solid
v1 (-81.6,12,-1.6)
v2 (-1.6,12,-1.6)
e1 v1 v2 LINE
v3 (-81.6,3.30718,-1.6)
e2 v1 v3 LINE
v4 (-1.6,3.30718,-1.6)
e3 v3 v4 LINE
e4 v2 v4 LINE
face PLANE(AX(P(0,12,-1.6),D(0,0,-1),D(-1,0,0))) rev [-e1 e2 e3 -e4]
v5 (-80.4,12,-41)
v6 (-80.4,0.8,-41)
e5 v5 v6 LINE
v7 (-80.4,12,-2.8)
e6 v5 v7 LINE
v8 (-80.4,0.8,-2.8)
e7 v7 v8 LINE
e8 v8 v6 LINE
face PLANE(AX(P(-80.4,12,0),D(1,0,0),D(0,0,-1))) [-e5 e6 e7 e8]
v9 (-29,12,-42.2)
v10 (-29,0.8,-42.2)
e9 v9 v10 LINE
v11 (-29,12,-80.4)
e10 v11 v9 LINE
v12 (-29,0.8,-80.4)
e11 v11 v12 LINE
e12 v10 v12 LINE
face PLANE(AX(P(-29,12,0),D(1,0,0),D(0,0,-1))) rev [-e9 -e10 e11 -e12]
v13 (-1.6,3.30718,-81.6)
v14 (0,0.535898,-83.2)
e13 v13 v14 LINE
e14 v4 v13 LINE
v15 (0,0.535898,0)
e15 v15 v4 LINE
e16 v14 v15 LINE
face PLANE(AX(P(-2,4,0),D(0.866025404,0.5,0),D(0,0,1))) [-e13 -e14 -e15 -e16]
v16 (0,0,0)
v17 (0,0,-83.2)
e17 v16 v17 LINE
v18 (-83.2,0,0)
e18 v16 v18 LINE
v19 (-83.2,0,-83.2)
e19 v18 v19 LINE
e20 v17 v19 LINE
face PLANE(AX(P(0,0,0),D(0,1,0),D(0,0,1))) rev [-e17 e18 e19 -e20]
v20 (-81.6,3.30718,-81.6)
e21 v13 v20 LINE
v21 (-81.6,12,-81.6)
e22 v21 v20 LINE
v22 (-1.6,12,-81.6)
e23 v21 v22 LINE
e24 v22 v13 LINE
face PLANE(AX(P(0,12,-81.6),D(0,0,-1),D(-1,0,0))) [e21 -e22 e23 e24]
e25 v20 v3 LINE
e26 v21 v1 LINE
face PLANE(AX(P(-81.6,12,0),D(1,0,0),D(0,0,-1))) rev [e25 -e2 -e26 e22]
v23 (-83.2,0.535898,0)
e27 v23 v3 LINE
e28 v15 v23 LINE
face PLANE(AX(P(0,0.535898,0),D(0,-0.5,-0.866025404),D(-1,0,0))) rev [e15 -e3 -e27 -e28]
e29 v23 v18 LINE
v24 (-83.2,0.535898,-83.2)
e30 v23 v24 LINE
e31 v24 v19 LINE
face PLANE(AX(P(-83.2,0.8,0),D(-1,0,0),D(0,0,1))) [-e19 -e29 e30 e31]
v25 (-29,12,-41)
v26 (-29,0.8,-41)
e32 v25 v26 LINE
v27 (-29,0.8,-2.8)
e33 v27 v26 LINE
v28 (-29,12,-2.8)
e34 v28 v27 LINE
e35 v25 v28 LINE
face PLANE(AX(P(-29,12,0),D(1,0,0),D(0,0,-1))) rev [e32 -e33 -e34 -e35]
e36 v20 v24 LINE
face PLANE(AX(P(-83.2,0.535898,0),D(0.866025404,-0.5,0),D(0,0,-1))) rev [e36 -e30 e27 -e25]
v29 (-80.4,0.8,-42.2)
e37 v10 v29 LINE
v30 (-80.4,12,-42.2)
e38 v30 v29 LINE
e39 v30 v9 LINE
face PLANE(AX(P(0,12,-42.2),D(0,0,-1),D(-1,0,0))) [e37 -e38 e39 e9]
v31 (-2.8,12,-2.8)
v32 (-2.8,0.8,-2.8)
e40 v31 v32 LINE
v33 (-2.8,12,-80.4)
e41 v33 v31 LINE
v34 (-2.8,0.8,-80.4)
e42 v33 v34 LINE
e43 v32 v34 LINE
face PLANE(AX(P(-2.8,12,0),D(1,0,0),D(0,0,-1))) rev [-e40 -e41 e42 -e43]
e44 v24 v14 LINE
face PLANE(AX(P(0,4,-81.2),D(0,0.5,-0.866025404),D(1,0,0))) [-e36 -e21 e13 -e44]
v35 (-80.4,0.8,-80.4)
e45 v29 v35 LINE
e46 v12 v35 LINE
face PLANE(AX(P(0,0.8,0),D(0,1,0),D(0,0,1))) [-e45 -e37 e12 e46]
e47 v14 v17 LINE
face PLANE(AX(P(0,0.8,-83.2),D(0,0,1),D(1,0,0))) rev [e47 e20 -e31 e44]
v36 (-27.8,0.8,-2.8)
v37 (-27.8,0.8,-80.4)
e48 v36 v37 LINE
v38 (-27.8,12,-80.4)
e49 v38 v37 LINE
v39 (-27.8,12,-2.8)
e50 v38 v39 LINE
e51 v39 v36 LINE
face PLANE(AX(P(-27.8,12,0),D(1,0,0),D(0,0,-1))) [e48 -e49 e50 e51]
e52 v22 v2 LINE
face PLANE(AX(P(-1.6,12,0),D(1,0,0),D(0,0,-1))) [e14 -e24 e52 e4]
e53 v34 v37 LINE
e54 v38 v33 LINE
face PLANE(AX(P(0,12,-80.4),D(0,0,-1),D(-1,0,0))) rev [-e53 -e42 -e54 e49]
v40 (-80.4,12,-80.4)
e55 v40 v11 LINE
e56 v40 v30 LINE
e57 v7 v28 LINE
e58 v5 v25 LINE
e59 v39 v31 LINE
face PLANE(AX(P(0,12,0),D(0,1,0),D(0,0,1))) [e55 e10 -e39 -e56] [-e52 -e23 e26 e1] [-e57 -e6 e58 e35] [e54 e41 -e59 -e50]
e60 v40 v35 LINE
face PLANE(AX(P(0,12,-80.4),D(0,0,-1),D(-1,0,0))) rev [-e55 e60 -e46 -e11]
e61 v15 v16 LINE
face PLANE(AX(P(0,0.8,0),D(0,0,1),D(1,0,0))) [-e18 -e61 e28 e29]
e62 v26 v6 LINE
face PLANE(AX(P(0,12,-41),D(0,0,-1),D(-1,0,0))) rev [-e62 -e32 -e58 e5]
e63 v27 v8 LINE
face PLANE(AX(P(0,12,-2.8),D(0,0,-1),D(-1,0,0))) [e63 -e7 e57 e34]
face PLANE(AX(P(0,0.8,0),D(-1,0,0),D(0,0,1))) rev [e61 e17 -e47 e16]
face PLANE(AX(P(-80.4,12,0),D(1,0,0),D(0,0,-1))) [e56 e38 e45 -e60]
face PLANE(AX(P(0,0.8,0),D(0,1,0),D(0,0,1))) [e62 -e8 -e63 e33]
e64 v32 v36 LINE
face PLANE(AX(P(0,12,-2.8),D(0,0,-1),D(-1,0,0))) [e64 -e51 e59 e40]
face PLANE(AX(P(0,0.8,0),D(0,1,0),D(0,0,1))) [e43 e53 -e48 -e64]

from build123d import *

# Parameters (mm, degrees)
SKICA1_W                = 83.2
SKICA1_H                = 83.2
P_IDAT_VYSUNUT_M1_DEPTH = 0.8
SKICA1_3_W              = 80
SKICA1_3_H              = 80
SKICA1_3_W_2            = 25
SKICA1_3_H_2            = 77.6
SKICA1_3_W_3            = 51.4
SKICA1_3_H_3            = 38.2
P_IDAT_VYSUNUT_M2_DEPTH = 12
SKICA1_4_W              = 83.2
SKICA1_4_H              = 83.2
SKICA1_4_W_2            = 80
SKICA1_4_H_2            = 80
P_IDAT_VYSUNUT_M3_DEPTH = 4
ZKOSEN_2_SIZE           = 3.464101615
ZKOSEN_2_SIZE_2         = 2


with BuildPart() as part:
    # Skica1 → Přidat vysunutím1 (new body)
    with BuildSketch(Plane(origin=(0, 0, 0), x_dir=(1, 0, 0), z_dir=(0, 1, 0))):
        with Locations((-41.6, 41.6)):
            Rectangle(SKICA1_W, SKICA1_H)
    extrude(amount=P_IDAT_VYSUNUT_M1_DEPTH)

    # Skica1<3> → Přidat vysunutím2 (add)
    with BuildSketch(Plane(origin=(0, 0, 0), x_dir=(1, 0, 0), z_dir=(0, 1, 0))):
        with Locations((-41.6, 41.6)):
            Rectangle(SKICA1_3_W, SKICA1_3_H)
        with Locations((-15.3, 41.6)):
            Rectangle(SKICA1_3_W_2, SKICA1_3_H_2, mode=Mode.SUBTRACT)
        with Locations((-54.7, 61.3)):
            Rectangle(SKICA1_3_W_3, SKICA1_3_H_3, mode=Mode.SUBTRACT)
        with Locations((-54.7, 21.9)):
            Rectangle(SKICA1_3_W_3, SKICA1_3_H_3, mode=Mode.SUBTRACT)
    extrude(amount=P_IDAT_VYSUNUT_M2_DEPTH)

    # Skica1<4> → Přidat vysunutím3 (add)
    with BuildSketch(Plane(origin=(0, 0, 0), x_dir=(1, 0, 0), z_dir=(0, 1, 0))):
        with Locations((-41.6, 41.6)):
            Rectangle(SKICA1_4_W, SKICA1_4_H)
        with Locations((-41.6, 41.6)):
            Rectangle(SKICA1_4_W_2, SKICA1_4_H_2, mode=Mode.SUBTRACT)
    extrude(amount=P_IDAT_VYSUNUT_M3_DEPTH)

    # Zkosení2
    # the kernel refuses this chamfer: 3.464101615, 2 mm, written as the material it takes off along each edge
    with BuildSketch(Plane(origin=(-83.2, 4, 8.961927941), x_dir=(-0.0193267656126997, -0.9998132206222079, 0), z_dir=(0, 0, -1))) as zkosen_2_piece_1_section:
        Polygon((ZKOSEN_2_SIZE * 0.999813220662, -ZKOSEN_2_SIZE * 0.0193267656135), (-ZKOSEN_2_SIZE_2 * 0.0193267656127, -ZKOSEN_2_SIZE_2 * 0.999813220622), (0, 0), align=None)
    zkosen_2_piece_1 = extrude(amount=101.123855882, mode=Mode.PRIVATE)
    zkosen_2_piece_1 = split(zkosen_2_piece_1, bisect_by=Plane(origin=(-81.6, 2.781142692, 3.680963971), z_dir=(-1, 0, 0)), keep=Keep.TOP, mode=Mode.PRIVATE)
    zkosen_2_piece_1 = split(zkosen_2_piece_1, bisect_by=Plane(origin=(-82.620942714, 2.781142692, -1.6), z_dir=(0, 0, 1)), keep=Keep.TOP, mode=Mode.PRIVATE)
    add(zkosen_2_piece_1, mode=Mode.SUBTRACT)
    with BuildSketch(Plane(origin=(-83.2, 4, 8.961927941), x_dir=(-0.0193267656126997, -0.9998132206222079, 0), z_dir=(0, 0, -1))) as zkosen_2_piece_2_section:
        Polygon((ZKOSEN_2_SIZE * 0.999813220662, -ZKOSEN_2_SIZE * 0.0193267656135), (-ZKOSEN_2_SIZE_2 * 0.0193267656127, -ZKOSEN_2_SIZE_2 * 0.999813220622), (0, 0), align=None)
    zkosen_2_piece_2 = extrude(amount=101.123855882, mode=Mode.PRIVATE)
    zkosen_2_piece_2 = split(zkosen_2_piece_2, bisect_by=Plane(origin=(-81.6, 3.870737408, 3.680963971), z_dir=(1, 0, 0)), keep=Keep.TOP, mode=Mode.PRIVATE)
    zkosen_2_piece_2 = split(zkosen_2_piece_2, bisect_by=Plane(origin=(-81.431601135, 3.870737408, -1.6), z_dir=(0, 0, 1)), keep=Keep.TOP, mode=Mode.PRIVATE)
    add(zkosen_2_piece_2, mode=Mode.SUBTRACT)
    with BuildSketch(Plane(origin=(-83.2, 4, 8.961927941), x_dir=(-0.0193267656126997, -0.9998132206222079, 0), z_dir=(0, 0, -1))) as zkosen_2_piece_3_section:
        Polygon((ZKOSEN_2_SIZE * 0.999813220662, -ZKOSEN_2_SIZE * 0.0193267656135), (-ZKOSEN_2_SIZE_2 * 0.0193267656127, -ZKOSEN_2_SIZE_2 * 0.999813220622), (0, 0), align=None)
    zkosen_2_piece_3 = extrude(amount=101.123855882, mode=Mode.PRIVATE)
    zkosen_2_piece_3 = split(zkosen_2_piece_3, bisect_by=Plane(origin=(-81.6, 2.781142692, -41.6), z_dir=(-1, 0, 0)), keep=Keep.TOP, mode=Mode.PRIVATE)
    zkosen_2_piece_3 = split(zkosen_2_piece_3, bisect_by=Plane(origin=(-82.620942714, 2.781142692, -1.6), z_dir=(0, 0, -1)), keep=Keep.TOP, mode=Mode.PRIVATE)
    zkosen_2_piece_3 = split(zkosen_2_piece_3, bisect_by=Plane(origin=(-82.620942714, 2.781142692, -81.6), z_dir=(0, 0, 1)), keep=Keep.TOP, mode=Mode.PRIVATE)
    add(zkosen_2_piece_3, mode=Mode.SUBTRACT)
    with BuildSketch(Plane(origin=(-83.2, 4, 8.961927941), x_dir=(-0.0193267656126997, -0.9998132206222079, 0), z_dir=(0, 0, -1))) as zkosen_2_piece_4_section:
        Polygon((ZKOSEN_2_SIZE * 0.999813220662, -ZKOSEN_2_SIZE * 0.0193267656135), (-ZKOSEN_2_SIZE_2 * 0.0193267656127, -ZKOSEN_2_SIZE_2 * 0.999813220622), (0, 0), align=None)
    zkosen_2_piece_4 = extrude(amount=101.123855882, mode=Mode.PRIVATE)
    zkosen_2_piece_4 = split(zkosen_2_piece_4, bisect_by=Plane(origin=(-81.6, 2.781142692, -86.880963971), z_dir=(-1, 0, 0)), keep=Keep.TOP, mode=Mode.PRIVATE)
    zkosen_2_piece_4 = split(zkosen_2_piece_4, bisect_by=Plane(origin=(-82.620942714, 2.781142692, -81.6), z_dir=(0, 0, -1)), keep=Keep.TOP, mode=Mode.PRIVATE)
    add(zkosen_2_piece_4, mode=Mode.SUBTRACT)
    with BuildSketch(Plane(origin=(-83.2, 4, 8.961927941), x_dir=(-0.0193267656126997, -0.9998132206222079, 0), z_dir=(0, 0, -1))) as zkosen_2_piece_5_section:
        Polygon((ZKOSEN_2_SIZE * 0.999813220662, -ZKOSEN_2_SIZE * 0.0193267656135), (-ZKOSEN_2_SIZE_2 * 0.0193267656127, -ZKOSEN_2_SIZE_2 * 0.999813220622), (0, 0), align=None)
    zkosen_2_piece_5 = extrude(amount=101.123855882, mode=Mode.PRIVATE)
    zkosen_2_piece_5 = split(zkosen_2_piece_5, bisect_by=Plane(origin=(-81.6, 3.870737408, -86.880963971), z_dir=(1, 0, 0)), keep=Keep.TOP, mode=Mode.PRIVATE)
    zkosen_2_piece_5 = split(zkosen_2_piece_5, bisect_by=Plane(origin=(-81.431601135, 3.870737408, -81.6), z_dir=(0, 0, -1)), keep=Keep.TOP, mode=Mode.PRIVATE)
    add(zkosen_2_piece_5, mode=Mode.SUBTRACT)
    with BuildSketch(Plane(origin=(-92.161927941, 4, -83.2), x_dir=(0, -0.9998132206222079, -0.0193267656126997), z_dir=(1, 0, 0))) as zkosen_2_piece_6_section:
        Polygon((ZKOSEN_2_SIZE * 0.999813220662, -ZKOSEN_2_SIZE * 0.0193267656135), (-ZKOSEN_2_SIZE_2 * 0.0193267656127, -ZKOSEN_2_SIZE_2 * 0.999813220622), (0, 0), align=None)
    zkosen_2_piece_6 = extrude(amount=101.123855882, mode=Mode.PRIVATE)
    zkosen_2_piece_6 = split(zkosen_2_piece_6, bisect_by=Plane(origin=(-81.6, 2.781142692, -82.620942714), z_dir=(-1, 0, 0)), keep=Keep.TOP, mode=Mode.PRIVATE)
    zkosen_2_piece_6 = split(zkosen_2_piece_6, bisect_by=Plane(origin=(-86.880963971, 2.781142692, -81.6), z_dir=(0, 0, -1)), keep=Keep.TOP, mode=Mode.PRIVATE)
    add(zkosen_2_piece_6, mode=Mode.SUBTRACT)
    with BuildSketch(Plane(origin=(-92.161927941, 4, -83.2), x_dir=(0, -0.9998132206222079, -0.0193267656126997), z_dir=(1, 0, 0))) as zkosen_2_piece_7_section:
        Polygon((ZKOSEN_2_SIZE * 0.999813220662, -ZKOSEN_2_SIZE * 0.0193267656135), (-ZKOSEN_2_SIZE_2 * 0.0193267656127, -ZKOSEN_2_SIZE_2 * 0.999813220622), (0, 0), align=None)
    zkosen_2_piece_7 = extrude(amount=101.123855882, mode=Mode.PRIVATE)
    zkosen_2_piece_7 = split(zkosen_2_piece_7, bisect_by=Plane(origin=(-81.6, 3.870737408, -81.431601135), z_dir=(-1, 0, 0)), keep=Keep.TOP, mode=Mode.PRIVATE)
    zkosen_2_piece_7 = split(zkosen_2_piece_7, bisect_by=Plane(origin=(-86.880963971, 3.870737408, -81.6), z_dir=(0, 0, 1)), keep=Keep.TOP, mode=Mode.PRIVATE)
    add(zkosen_2_piece_7, mode=Mode.SUBTRACT)
    with BuildSketch(Plane(origin=(-92.161927941, 4, -83.2), x_dir=(0, -0.9998132206222079, -0.0193267656126997), z_dir=(1, 0, 0))) as zkosen_2_piece_8_section:
        Polygon((ZKOSEN_2_SIZE * 0.999813220662, -ZKOSEN_2_SIZE * 0.0193267656135), (-ZKOSEN_2_SIZE_2 * 0.0193267656127, -ZKOSEN_2_SIZE_2 * 0.999813220622), (0, 0), align=None)
    zkosen_2_piece_8 = extrude(amount=101.123855882, mode=Mode.PRIVATE)
    zkosen_2_piece_8 = split(zkosen_2_piece_8, bisect_by=Plane(origin=(-81.6, 2.781142692, -82.620942714), z_dir=(1, 0, 0)), keep=Keep.TOP, mode=Mode.PRIVATE)
    zkosen_2_piece_8 = split(zkosen_2_piece_8, bisect_by=Plane(origin=(-1.6, 2.781142692, -82.620942714), z_dir=(-1, 0, 0)), keep=Keep.TOP, mode=Mode.PRIVATE)
    zkosen_2_piece_8 = split(zkosen_2_piece_8, bisect_by=Plane(origin=(-41.6, 2.781142692, -81.6), z_dir=(0, 0, -1)), keep=Keep.TOP, mode=Mode.PRIVATE)
    add(zkosen_2_piece_8, mode=Mode.SUBTRACT)
    with BuildSketch(Plane(origin=(-92.161927941, 4, -83.2), x_dir=(0, -0.9998132206222079, -0.0193267656126997), z_dir=(1, 0, 0))) as zkosen_2_piece_9_section:
        Polygon((ZKOSEN_2_SIZE * 0.999813220662, -ZKOSEN_2_SIZE * 0.0193267656135), (-ZKOSEN_2_SIZE_2 * 0.0193267656127, -ZKOSEN_2_SIZE_2 * 0.999813220622), (0, 0), align=None)
    zkosen_2_piece_9 = extrude(amount=101.123855882, mode=Mode.PRIVATE)
    zkosen_2_piece_9 = split(zkosen_2_piece_9, bisect_by=Plane(origin=(-1.6, 2.781142692, -82.620942714), z_dir=(1, 0, 0)), keep=Keep.TOP, mode=Mode.PRIVATE)
    zkosen_2_piece_9 = split(zkosen_2_piece_9, bisect_by=Plane(origin=(3.680963971, 2.781142692, -81.6), z_dir=(0, 0, -1)), keep=Keep.TOP, mode=Mode.PRIVATE)
    add(zkosen_2_piece_9, mode=Mode.SUBTRACT)
    with BuildSketch(Plane(origin=(-92.161927941, 4, -83.2), x_dir=(0, -0.9998132206222079, -0.0193267656126997), z_dir=(1, 0, 0))) as zkosen_2_piece_10_section:
        Polygon((ZKOSEN_2_SIZE * 0.999813220662, -ZKOSEN_2_SIZE * 0.0193267656135), (-ZKOSEN_2_SIZE_2 * 0.0193267656127, -ZKOSEN_2_SIZE_2 * 0.999813220622), (0, 0), align=None)
    zkosen_2_piece_10 = extrude(amount=101.123855882, mode=Mode.PRIVATE)
    zkosen_2_piece_10 = split(zkosen_2_piece_10, bisect_by=Plane(origin=(-1.6, 3.870737408, -81.431601135), z_dir=(1, 0, 0)), keep=Keep.TOP, mode=Mode.PRIVATE)
    zkosen_2_piece_10 = split(zkosen_2_piece_10, bisect_by=Plane(origin=(3.680963971, 3.870737408, -81.6), z_dir=(0, 0, 1)), keep=Keep.TOP, mode=Mode.PRIVATE)
    add(zkosen_2_piece_10, mode=Mode.SUBTRACT)
    with BuildSketch(Plane(origin=(0, 4, -92.161927941), x_dir=(-0.9983227437537926, 0.057893862402671484, 0), z_dir=(0, 0, 1))) as zkosen_2_piece_11_section:
        Polygon((ZKOSEN_2_SIZE_2 * 0.998322743754, ZKOSEN_2_SIZE_2 * 0.0578938624027), (-ZKOSEN_2_SIZE * 0.057893862405, ZKOSEN_2_SIZE * 0.998322743793), (0, 0), align=None)
    zkosen_2_piece_11 = extrude(amount=101.123855882, mode=Mode.PRIVATE)
    zkosen_2_piece_11 = split(zkosen_2_piece_11, bisect_by=Plane(origin=(-1.6, 3.870737408, -86.880963971), z_dir=(-1, 0, 0)), keep=Keep.TOP, mode=Mode.PRIVATE)
    zkosen_2_piece_11 = split(zkosen_2_piece_11, bisect_by=Plane(origin=(-1.768398865, 3.870737408, -81.6), z_dir=(0, 0, -1)), keep=Keep.TOP, mode=Mode.PRIVATE)
    add(zkosen_2_piece_11, mode=Mode.SUBTRACT)
    with BuildSketch(Plane(origin=(0, 4, -92.161927941), x_dir=(-0.9983227437537926, 0.057893862402671484, 0), z_dir=(0, 0, 1))) as zkosen_2_piece_12_section:
        Polygon((ZKOSEN_2_SIZE_2 * 0.998322743754, ZKOSEN_2_SIZE_2 * 0.0578938624027), (-ZKOSEN_2_SIZE * 0.057893862405, ZKOSEN_2_SIZE * 0.998322743793), (0, 0), align=None)
    zkosen_2_piece_12 = extrude(amount=101.123855882, mode=Mode.PRIVATE)
    zkosen_2_piece_12 = split(zkosen_2_piece_12, bisect_by=Plane(origin=(-1.6, 2.781142692, -86.880963971), z_dir=(1, 0, 0)), keep=Keep.TOP, mode=Mode.PRIVATE)
    zkosen_2_piece_12 = split(zkosen_2_piece_12, bisect_by=Plane(origin=(-0.579057286, 2.781142692, -81.6), z_dir=(0, 0, -1)), keep=Keep.TOP, mode=Mode.PRIVATE)
    add(zkosen_2_piece_12, mode=Mode.SUBTRACT)
    with BuildSketch(Plane(origin=(0, 4, -92.161927941), x_dir=(-0.9983227437537926, 0.057893862402671484, 0), z_dir=(0, 0, 1))) as zkosen_2_piece_13_section:
        Polygon((ZKOSEN_2_SIZE_2 * 0.998322743754, ZKOSEN_2_SIZE_2 * 0.0578938624027), (-ZKOSEN_2_SIZE * 0.057893862405, ZKOSEN_2_SIZE * 0.998322743793), (0, 0), align=None)
    zkosen_2_piece_13 = extrude(amount=101.123855882, mode=Mode.PRIVATE)
    zkosen_2_piece_13 = split(zkosen_2_piece_13, bisect_by=Plane(origin=(-0.579057286, 2.781142692, -1.6), z_dir=(0, 0, -1)), keep=Keep.TOP, mode=Mode.PRIVATE)
    zkosen_2_piece_13 = split(zkosen_2_piece_13, bisect_by=Plane(origin=(-1.6, 2.781142692, -41.6), z_dir=(1, 0, 0)), keep=Keep.TOP, mode=Mode.PRIVATE)
    zkosen_2_piece_13 = split(zkosen_2_piece_13, bisect_by=Plane(origin=(-0.579057286, 2.781142692, -81.6), z_dir=(0, 0, 1)), keep=Keep.TOP, mode=Mode.PRIVATE)
    add(zkosen_2_piece_13, mode=Mode.SUBTRACT)
    with BuildSketch(Plane(origin=(0, 4, -92.161927941), x_dir=(-0.9983227437537926, 0.057893862402671484, 0), z_dir=(0, 0, 1))) as zkosen_2_piece_14_section:
        Polygon((ZKOSEN_2_SIZE_2 * 0.998322743754, ZKOSEN_2_SIZE_2 * 0.0578938624027), (-ZKOSEN_2_SIZE * 0.057893862405, ZKOSEN_2_SIZE * 0.998322743793), (0, 0), align=None)
    zkosen_2_piece_14 = extrude(amount=101.123855882, mode=Mode.PRIVATE)
    zkosen_2_piece_14 = split(zkosen_2_piece_14, bisect_by=Plane(origin=(-1.768398865, 3.870737408, -1.6), z_dir=(0, 0, 1)), keep=Keep.TOP, mode=Mode.PRIVATE)
    zkosen_2_piece_14 = split(zkosen_2_piece_14, bisect_by=Plane(origin=(-1.6, 3.870737408, 3.680963971), z_dir=(-1, 0, 0)), keep=Keep.TOP, mode=Mode.PRIVATE)
    add(zkosen_2_piece_14, mode=Mode.SUBTRACT)
    with BuildSketch(Plane(origin=(0, 4, -92.161927941), x_dir=(-0.9983227437537926, 0.057893862402671484, 0), z_dir=(0, 0, 1))) as zkosen_2_piece_15_section:
        Polygon((ZKOSEN_2_SIZE_2 * 0.998322743754, ZKOSEN_2_SIZE_2 * 0.0578938624027), (-ZKOSEN_2_SIZE * 0.057893862405, ZKOSEN_2_SIZE * 0.998322743793), (0, 0), align=None)
    zkosen_2_piece_15 = extrude(amount=101.123855882, mode=Mode.PRIVATE)
    zkosen_2_piece_15 = split(zkosen_2_piece_15, bisect_by=Plane(origin=(-0.579057286, 2.781142692, -1.6), z_dir=(0, 0, 1)), keep=Keep.TOP, mode=Mode.PRIVATE)
    zkosen_2_piece_15 = split(zkosen_2_piece_15, bisect_by=Plane(origin=(-1.6, 2.781142692, 3.680963971), z_dir=(1, 0, 0)), keep=Keep.TOP, mode=Mode.PRIVATE)
    add(zkosen_2_piece_15, mode=Mode.SUBTRACT)
    with BuildSketch(Plane(origin=(8.961927941, 4, 0), x_dir=(0, -0.9998132206222079, 0.01932676561270061), z_dir=(-1, 0, 0))) as zkosen_2_piece_16_section:
        Polygon((ZKOSEN_2_SIZE * 0.999813220662, -ZKOSEN_2_SIZE * 0.0193267656135), (-ZKOSEN_2_SIZE_2 * 0.0193267656127, -ZKOSEN_2_SIZE_2 * 0.999813220622), (0, 0), align=None)
    zkosen_2_piece_16 = extrude(amount=101.123855882, mode=Mode.PRIVATE)
    zkosen_2_piece_16 = split(zkosen_2_piece_16, bisect_by=Plane(origin=(3.680963971, 2.781142692, -1.6), z_dir=(0, 0, 1)), keep=Keep.TOP, mode=Mode.PRIVATE)
    zkosen_2_piece_16 = split(zkosen_2_piece_16, bisect_by=Plane(origin=(-1.6, 2.781142692, -0.579057286), z_dir=(1, 0, 0)), keep=Keep.TOP, mode=Mode.PRIVATE)
    add(zkosen_2_piece_16, mode=Mode.SUBTRACT)
    with BuildSketch(Plane(origin=(8.961927941, 4, 0), x_dir=(0, -0.9998132206222079, 0.01932676561270061), z_dir=(-1, 0, 0))) as zkosen_2_piece_17_section:
        Polygon((ZKOSEN_2_SIZE * 0.999813220662, -ZKOSEN_2_SIZE * 0.0193267656135), (-ZKOSEN_2_SIZE_2 * 0.0193267656127, -ZKOSEN_2_SIZE_2 * 0.999813220622), (0, 0), align=None)
    zkosen_2_piece_17 = extrude(amount=101.123855882, mode=Mode.PRIVATE)
    zkosen_2_piece_17 = split(zkosen_2_piece_17, bisect_by=Plane(origin=(3.680963971, 3.870737408, -1.6), z_dir=(0, 0, -1)), keep=Keep.TOP, mode=Mode.PRIVATE)
    zkosen_2_piece_17 = split(zkosen_2_piece_17, bisect_by=Plane(origin=(-1.6, 3.870737408, -1.768398865), z_dir=(1, 0, 0)), keep=Keep.TOP, mode=Mode.PRIVATE)
    add(zkosen_2_piece_17, mode=Mode.SUBTRACT)
    with BuildSketch(Plane(origin=(8.961927941, 4, 0), x_dir=(0, -0.9998132206222079, 0.01932676561270061), z_dir=(-1, 0, 0))) as zkosen_2_piece_18_section:
        Polygon((ZKOSEN_2_SIZE * 0.999813220662, -ZKOSEN_2_SIZE * 0.0193267656135), (-ZKOSEN_2_SIZE_2 * 0.0193267656127, -ZKOSEN_2_SIZE_2 * 0.999813220622), (0, 0), align=None)
    zkosen_2_piece_18 = extrude(amount=101.123855882, mode=Mode.PRIVATE)
    zkosen_2_piece_18 = split(zkosen_2_piece_18, bisect_by=Plane(origin=(-81.6, 2.781142692, -0.579057286), z_dir=(1, 0, 0)), keep=Keep.TOP, mode=Mode.PRIVATE)
    zkosen_2_piece_18 = split(zkosen_2_piece_18, bisect_by=Plane(origin=(-41.6, 2.781142692, -1.6), z_dir=(0, 0, 1)), keep=Keep.TOP, mode=Mode.PRIVATE)
    zkosen_2_piece_18 = split(zkosen_2_piece_18, bisect_by=Plane(origin=(-1.6, 2.781142692, -0.579057286), z_dir=(-1, 0, 0)), keep=Keep.TOP, mode=Mode.PRIVATE)
    add(zkosen_2_piece_18, mode=Mode.SUBTRACT)
    with BuildSketch(Plane(origin=(8.961927941, 4, 0), x_dir=(0, -0.9998132206222079, 0.01932676561270061), z_dir=(-1, 0, 0))) as zkosen_2_piece_19_section:
        Polygon((ZKOSEN_2_SIZE * 0.999813220662, -ZKOSEN_2_SIZE * 0.0193267656135), (-ZKOSEN_2_SIZE_2 * 0.0193267656127, -ZKOSEN_2_SIZE_2 * 0.999813220622), (0, 0), align=None)
    zkosen_2_piece_19 = extrude(amount=101.123855882, mode=Mode.PRIVATE)
    zkosen_2_piece_19 = split(zkosen_2_piece_19, bisect_by=Plane(origin=(-81.6, 2.781142692, -0.579057286), z_dir=(-1, 0, 0)), keep=Keep.TOP, mode=Mode.PRIVATE)
    zkosen_2_piece_19 = split(zkosen_2_piece_19, bisect_by=Plane(origin=(-86.880963971, 2.781142692, -1.6), z_dir=(0, 0, 1)), keep=Keep.TOP, mode=Mode.PRIVATE)
    add(zkosen_2_piece_19, mode=Mode.SUBTRACT)
    with BuildSketch(Plane(origin=(8.961927941, 4, 0), x_dir=(0, -0.9998132206222079, 0.01932676561270061), z_dir=(-1, 0, 0))) as zkosen_2_piece_20_section:
        Polygon((ZKOSEN_2_SIZE * 0.999813220662, -ZKOSEN_2_SIZE * 0.0193267656135), (-ZKOSEN_2_SIZE_2 * 0.0193267656127, -ZKOSEN_2_SIZE_2 * 0.999813220622), (0, 0), align=None)
    zkosen_2_piece_20 = extrude(amount=101.123855882, mode=Mode.PRIVATE)
    zkosen_2_piece_20 = split(zkosen_2_piece_20, bisect_by=Plane(origin=(-81.6, 3.870737408, -1.768398865), z_dir=(-1, 0, 0)), keep=Keep.TOP, mode=Mode.PRIVATE)
    zkosen_2_piece_20 = split(zkosen_2_piece_20, bisect_by=Plane(origin=(-86.880963971, 3.870737408, -1.6), z_dir=(0, 0, -1)), keep=Keep.TOP, mode=Mode.PRIVATE)
    add(zkosen_2_piece_20, mode=Mode.SUBTRACT)


solid = part.part
